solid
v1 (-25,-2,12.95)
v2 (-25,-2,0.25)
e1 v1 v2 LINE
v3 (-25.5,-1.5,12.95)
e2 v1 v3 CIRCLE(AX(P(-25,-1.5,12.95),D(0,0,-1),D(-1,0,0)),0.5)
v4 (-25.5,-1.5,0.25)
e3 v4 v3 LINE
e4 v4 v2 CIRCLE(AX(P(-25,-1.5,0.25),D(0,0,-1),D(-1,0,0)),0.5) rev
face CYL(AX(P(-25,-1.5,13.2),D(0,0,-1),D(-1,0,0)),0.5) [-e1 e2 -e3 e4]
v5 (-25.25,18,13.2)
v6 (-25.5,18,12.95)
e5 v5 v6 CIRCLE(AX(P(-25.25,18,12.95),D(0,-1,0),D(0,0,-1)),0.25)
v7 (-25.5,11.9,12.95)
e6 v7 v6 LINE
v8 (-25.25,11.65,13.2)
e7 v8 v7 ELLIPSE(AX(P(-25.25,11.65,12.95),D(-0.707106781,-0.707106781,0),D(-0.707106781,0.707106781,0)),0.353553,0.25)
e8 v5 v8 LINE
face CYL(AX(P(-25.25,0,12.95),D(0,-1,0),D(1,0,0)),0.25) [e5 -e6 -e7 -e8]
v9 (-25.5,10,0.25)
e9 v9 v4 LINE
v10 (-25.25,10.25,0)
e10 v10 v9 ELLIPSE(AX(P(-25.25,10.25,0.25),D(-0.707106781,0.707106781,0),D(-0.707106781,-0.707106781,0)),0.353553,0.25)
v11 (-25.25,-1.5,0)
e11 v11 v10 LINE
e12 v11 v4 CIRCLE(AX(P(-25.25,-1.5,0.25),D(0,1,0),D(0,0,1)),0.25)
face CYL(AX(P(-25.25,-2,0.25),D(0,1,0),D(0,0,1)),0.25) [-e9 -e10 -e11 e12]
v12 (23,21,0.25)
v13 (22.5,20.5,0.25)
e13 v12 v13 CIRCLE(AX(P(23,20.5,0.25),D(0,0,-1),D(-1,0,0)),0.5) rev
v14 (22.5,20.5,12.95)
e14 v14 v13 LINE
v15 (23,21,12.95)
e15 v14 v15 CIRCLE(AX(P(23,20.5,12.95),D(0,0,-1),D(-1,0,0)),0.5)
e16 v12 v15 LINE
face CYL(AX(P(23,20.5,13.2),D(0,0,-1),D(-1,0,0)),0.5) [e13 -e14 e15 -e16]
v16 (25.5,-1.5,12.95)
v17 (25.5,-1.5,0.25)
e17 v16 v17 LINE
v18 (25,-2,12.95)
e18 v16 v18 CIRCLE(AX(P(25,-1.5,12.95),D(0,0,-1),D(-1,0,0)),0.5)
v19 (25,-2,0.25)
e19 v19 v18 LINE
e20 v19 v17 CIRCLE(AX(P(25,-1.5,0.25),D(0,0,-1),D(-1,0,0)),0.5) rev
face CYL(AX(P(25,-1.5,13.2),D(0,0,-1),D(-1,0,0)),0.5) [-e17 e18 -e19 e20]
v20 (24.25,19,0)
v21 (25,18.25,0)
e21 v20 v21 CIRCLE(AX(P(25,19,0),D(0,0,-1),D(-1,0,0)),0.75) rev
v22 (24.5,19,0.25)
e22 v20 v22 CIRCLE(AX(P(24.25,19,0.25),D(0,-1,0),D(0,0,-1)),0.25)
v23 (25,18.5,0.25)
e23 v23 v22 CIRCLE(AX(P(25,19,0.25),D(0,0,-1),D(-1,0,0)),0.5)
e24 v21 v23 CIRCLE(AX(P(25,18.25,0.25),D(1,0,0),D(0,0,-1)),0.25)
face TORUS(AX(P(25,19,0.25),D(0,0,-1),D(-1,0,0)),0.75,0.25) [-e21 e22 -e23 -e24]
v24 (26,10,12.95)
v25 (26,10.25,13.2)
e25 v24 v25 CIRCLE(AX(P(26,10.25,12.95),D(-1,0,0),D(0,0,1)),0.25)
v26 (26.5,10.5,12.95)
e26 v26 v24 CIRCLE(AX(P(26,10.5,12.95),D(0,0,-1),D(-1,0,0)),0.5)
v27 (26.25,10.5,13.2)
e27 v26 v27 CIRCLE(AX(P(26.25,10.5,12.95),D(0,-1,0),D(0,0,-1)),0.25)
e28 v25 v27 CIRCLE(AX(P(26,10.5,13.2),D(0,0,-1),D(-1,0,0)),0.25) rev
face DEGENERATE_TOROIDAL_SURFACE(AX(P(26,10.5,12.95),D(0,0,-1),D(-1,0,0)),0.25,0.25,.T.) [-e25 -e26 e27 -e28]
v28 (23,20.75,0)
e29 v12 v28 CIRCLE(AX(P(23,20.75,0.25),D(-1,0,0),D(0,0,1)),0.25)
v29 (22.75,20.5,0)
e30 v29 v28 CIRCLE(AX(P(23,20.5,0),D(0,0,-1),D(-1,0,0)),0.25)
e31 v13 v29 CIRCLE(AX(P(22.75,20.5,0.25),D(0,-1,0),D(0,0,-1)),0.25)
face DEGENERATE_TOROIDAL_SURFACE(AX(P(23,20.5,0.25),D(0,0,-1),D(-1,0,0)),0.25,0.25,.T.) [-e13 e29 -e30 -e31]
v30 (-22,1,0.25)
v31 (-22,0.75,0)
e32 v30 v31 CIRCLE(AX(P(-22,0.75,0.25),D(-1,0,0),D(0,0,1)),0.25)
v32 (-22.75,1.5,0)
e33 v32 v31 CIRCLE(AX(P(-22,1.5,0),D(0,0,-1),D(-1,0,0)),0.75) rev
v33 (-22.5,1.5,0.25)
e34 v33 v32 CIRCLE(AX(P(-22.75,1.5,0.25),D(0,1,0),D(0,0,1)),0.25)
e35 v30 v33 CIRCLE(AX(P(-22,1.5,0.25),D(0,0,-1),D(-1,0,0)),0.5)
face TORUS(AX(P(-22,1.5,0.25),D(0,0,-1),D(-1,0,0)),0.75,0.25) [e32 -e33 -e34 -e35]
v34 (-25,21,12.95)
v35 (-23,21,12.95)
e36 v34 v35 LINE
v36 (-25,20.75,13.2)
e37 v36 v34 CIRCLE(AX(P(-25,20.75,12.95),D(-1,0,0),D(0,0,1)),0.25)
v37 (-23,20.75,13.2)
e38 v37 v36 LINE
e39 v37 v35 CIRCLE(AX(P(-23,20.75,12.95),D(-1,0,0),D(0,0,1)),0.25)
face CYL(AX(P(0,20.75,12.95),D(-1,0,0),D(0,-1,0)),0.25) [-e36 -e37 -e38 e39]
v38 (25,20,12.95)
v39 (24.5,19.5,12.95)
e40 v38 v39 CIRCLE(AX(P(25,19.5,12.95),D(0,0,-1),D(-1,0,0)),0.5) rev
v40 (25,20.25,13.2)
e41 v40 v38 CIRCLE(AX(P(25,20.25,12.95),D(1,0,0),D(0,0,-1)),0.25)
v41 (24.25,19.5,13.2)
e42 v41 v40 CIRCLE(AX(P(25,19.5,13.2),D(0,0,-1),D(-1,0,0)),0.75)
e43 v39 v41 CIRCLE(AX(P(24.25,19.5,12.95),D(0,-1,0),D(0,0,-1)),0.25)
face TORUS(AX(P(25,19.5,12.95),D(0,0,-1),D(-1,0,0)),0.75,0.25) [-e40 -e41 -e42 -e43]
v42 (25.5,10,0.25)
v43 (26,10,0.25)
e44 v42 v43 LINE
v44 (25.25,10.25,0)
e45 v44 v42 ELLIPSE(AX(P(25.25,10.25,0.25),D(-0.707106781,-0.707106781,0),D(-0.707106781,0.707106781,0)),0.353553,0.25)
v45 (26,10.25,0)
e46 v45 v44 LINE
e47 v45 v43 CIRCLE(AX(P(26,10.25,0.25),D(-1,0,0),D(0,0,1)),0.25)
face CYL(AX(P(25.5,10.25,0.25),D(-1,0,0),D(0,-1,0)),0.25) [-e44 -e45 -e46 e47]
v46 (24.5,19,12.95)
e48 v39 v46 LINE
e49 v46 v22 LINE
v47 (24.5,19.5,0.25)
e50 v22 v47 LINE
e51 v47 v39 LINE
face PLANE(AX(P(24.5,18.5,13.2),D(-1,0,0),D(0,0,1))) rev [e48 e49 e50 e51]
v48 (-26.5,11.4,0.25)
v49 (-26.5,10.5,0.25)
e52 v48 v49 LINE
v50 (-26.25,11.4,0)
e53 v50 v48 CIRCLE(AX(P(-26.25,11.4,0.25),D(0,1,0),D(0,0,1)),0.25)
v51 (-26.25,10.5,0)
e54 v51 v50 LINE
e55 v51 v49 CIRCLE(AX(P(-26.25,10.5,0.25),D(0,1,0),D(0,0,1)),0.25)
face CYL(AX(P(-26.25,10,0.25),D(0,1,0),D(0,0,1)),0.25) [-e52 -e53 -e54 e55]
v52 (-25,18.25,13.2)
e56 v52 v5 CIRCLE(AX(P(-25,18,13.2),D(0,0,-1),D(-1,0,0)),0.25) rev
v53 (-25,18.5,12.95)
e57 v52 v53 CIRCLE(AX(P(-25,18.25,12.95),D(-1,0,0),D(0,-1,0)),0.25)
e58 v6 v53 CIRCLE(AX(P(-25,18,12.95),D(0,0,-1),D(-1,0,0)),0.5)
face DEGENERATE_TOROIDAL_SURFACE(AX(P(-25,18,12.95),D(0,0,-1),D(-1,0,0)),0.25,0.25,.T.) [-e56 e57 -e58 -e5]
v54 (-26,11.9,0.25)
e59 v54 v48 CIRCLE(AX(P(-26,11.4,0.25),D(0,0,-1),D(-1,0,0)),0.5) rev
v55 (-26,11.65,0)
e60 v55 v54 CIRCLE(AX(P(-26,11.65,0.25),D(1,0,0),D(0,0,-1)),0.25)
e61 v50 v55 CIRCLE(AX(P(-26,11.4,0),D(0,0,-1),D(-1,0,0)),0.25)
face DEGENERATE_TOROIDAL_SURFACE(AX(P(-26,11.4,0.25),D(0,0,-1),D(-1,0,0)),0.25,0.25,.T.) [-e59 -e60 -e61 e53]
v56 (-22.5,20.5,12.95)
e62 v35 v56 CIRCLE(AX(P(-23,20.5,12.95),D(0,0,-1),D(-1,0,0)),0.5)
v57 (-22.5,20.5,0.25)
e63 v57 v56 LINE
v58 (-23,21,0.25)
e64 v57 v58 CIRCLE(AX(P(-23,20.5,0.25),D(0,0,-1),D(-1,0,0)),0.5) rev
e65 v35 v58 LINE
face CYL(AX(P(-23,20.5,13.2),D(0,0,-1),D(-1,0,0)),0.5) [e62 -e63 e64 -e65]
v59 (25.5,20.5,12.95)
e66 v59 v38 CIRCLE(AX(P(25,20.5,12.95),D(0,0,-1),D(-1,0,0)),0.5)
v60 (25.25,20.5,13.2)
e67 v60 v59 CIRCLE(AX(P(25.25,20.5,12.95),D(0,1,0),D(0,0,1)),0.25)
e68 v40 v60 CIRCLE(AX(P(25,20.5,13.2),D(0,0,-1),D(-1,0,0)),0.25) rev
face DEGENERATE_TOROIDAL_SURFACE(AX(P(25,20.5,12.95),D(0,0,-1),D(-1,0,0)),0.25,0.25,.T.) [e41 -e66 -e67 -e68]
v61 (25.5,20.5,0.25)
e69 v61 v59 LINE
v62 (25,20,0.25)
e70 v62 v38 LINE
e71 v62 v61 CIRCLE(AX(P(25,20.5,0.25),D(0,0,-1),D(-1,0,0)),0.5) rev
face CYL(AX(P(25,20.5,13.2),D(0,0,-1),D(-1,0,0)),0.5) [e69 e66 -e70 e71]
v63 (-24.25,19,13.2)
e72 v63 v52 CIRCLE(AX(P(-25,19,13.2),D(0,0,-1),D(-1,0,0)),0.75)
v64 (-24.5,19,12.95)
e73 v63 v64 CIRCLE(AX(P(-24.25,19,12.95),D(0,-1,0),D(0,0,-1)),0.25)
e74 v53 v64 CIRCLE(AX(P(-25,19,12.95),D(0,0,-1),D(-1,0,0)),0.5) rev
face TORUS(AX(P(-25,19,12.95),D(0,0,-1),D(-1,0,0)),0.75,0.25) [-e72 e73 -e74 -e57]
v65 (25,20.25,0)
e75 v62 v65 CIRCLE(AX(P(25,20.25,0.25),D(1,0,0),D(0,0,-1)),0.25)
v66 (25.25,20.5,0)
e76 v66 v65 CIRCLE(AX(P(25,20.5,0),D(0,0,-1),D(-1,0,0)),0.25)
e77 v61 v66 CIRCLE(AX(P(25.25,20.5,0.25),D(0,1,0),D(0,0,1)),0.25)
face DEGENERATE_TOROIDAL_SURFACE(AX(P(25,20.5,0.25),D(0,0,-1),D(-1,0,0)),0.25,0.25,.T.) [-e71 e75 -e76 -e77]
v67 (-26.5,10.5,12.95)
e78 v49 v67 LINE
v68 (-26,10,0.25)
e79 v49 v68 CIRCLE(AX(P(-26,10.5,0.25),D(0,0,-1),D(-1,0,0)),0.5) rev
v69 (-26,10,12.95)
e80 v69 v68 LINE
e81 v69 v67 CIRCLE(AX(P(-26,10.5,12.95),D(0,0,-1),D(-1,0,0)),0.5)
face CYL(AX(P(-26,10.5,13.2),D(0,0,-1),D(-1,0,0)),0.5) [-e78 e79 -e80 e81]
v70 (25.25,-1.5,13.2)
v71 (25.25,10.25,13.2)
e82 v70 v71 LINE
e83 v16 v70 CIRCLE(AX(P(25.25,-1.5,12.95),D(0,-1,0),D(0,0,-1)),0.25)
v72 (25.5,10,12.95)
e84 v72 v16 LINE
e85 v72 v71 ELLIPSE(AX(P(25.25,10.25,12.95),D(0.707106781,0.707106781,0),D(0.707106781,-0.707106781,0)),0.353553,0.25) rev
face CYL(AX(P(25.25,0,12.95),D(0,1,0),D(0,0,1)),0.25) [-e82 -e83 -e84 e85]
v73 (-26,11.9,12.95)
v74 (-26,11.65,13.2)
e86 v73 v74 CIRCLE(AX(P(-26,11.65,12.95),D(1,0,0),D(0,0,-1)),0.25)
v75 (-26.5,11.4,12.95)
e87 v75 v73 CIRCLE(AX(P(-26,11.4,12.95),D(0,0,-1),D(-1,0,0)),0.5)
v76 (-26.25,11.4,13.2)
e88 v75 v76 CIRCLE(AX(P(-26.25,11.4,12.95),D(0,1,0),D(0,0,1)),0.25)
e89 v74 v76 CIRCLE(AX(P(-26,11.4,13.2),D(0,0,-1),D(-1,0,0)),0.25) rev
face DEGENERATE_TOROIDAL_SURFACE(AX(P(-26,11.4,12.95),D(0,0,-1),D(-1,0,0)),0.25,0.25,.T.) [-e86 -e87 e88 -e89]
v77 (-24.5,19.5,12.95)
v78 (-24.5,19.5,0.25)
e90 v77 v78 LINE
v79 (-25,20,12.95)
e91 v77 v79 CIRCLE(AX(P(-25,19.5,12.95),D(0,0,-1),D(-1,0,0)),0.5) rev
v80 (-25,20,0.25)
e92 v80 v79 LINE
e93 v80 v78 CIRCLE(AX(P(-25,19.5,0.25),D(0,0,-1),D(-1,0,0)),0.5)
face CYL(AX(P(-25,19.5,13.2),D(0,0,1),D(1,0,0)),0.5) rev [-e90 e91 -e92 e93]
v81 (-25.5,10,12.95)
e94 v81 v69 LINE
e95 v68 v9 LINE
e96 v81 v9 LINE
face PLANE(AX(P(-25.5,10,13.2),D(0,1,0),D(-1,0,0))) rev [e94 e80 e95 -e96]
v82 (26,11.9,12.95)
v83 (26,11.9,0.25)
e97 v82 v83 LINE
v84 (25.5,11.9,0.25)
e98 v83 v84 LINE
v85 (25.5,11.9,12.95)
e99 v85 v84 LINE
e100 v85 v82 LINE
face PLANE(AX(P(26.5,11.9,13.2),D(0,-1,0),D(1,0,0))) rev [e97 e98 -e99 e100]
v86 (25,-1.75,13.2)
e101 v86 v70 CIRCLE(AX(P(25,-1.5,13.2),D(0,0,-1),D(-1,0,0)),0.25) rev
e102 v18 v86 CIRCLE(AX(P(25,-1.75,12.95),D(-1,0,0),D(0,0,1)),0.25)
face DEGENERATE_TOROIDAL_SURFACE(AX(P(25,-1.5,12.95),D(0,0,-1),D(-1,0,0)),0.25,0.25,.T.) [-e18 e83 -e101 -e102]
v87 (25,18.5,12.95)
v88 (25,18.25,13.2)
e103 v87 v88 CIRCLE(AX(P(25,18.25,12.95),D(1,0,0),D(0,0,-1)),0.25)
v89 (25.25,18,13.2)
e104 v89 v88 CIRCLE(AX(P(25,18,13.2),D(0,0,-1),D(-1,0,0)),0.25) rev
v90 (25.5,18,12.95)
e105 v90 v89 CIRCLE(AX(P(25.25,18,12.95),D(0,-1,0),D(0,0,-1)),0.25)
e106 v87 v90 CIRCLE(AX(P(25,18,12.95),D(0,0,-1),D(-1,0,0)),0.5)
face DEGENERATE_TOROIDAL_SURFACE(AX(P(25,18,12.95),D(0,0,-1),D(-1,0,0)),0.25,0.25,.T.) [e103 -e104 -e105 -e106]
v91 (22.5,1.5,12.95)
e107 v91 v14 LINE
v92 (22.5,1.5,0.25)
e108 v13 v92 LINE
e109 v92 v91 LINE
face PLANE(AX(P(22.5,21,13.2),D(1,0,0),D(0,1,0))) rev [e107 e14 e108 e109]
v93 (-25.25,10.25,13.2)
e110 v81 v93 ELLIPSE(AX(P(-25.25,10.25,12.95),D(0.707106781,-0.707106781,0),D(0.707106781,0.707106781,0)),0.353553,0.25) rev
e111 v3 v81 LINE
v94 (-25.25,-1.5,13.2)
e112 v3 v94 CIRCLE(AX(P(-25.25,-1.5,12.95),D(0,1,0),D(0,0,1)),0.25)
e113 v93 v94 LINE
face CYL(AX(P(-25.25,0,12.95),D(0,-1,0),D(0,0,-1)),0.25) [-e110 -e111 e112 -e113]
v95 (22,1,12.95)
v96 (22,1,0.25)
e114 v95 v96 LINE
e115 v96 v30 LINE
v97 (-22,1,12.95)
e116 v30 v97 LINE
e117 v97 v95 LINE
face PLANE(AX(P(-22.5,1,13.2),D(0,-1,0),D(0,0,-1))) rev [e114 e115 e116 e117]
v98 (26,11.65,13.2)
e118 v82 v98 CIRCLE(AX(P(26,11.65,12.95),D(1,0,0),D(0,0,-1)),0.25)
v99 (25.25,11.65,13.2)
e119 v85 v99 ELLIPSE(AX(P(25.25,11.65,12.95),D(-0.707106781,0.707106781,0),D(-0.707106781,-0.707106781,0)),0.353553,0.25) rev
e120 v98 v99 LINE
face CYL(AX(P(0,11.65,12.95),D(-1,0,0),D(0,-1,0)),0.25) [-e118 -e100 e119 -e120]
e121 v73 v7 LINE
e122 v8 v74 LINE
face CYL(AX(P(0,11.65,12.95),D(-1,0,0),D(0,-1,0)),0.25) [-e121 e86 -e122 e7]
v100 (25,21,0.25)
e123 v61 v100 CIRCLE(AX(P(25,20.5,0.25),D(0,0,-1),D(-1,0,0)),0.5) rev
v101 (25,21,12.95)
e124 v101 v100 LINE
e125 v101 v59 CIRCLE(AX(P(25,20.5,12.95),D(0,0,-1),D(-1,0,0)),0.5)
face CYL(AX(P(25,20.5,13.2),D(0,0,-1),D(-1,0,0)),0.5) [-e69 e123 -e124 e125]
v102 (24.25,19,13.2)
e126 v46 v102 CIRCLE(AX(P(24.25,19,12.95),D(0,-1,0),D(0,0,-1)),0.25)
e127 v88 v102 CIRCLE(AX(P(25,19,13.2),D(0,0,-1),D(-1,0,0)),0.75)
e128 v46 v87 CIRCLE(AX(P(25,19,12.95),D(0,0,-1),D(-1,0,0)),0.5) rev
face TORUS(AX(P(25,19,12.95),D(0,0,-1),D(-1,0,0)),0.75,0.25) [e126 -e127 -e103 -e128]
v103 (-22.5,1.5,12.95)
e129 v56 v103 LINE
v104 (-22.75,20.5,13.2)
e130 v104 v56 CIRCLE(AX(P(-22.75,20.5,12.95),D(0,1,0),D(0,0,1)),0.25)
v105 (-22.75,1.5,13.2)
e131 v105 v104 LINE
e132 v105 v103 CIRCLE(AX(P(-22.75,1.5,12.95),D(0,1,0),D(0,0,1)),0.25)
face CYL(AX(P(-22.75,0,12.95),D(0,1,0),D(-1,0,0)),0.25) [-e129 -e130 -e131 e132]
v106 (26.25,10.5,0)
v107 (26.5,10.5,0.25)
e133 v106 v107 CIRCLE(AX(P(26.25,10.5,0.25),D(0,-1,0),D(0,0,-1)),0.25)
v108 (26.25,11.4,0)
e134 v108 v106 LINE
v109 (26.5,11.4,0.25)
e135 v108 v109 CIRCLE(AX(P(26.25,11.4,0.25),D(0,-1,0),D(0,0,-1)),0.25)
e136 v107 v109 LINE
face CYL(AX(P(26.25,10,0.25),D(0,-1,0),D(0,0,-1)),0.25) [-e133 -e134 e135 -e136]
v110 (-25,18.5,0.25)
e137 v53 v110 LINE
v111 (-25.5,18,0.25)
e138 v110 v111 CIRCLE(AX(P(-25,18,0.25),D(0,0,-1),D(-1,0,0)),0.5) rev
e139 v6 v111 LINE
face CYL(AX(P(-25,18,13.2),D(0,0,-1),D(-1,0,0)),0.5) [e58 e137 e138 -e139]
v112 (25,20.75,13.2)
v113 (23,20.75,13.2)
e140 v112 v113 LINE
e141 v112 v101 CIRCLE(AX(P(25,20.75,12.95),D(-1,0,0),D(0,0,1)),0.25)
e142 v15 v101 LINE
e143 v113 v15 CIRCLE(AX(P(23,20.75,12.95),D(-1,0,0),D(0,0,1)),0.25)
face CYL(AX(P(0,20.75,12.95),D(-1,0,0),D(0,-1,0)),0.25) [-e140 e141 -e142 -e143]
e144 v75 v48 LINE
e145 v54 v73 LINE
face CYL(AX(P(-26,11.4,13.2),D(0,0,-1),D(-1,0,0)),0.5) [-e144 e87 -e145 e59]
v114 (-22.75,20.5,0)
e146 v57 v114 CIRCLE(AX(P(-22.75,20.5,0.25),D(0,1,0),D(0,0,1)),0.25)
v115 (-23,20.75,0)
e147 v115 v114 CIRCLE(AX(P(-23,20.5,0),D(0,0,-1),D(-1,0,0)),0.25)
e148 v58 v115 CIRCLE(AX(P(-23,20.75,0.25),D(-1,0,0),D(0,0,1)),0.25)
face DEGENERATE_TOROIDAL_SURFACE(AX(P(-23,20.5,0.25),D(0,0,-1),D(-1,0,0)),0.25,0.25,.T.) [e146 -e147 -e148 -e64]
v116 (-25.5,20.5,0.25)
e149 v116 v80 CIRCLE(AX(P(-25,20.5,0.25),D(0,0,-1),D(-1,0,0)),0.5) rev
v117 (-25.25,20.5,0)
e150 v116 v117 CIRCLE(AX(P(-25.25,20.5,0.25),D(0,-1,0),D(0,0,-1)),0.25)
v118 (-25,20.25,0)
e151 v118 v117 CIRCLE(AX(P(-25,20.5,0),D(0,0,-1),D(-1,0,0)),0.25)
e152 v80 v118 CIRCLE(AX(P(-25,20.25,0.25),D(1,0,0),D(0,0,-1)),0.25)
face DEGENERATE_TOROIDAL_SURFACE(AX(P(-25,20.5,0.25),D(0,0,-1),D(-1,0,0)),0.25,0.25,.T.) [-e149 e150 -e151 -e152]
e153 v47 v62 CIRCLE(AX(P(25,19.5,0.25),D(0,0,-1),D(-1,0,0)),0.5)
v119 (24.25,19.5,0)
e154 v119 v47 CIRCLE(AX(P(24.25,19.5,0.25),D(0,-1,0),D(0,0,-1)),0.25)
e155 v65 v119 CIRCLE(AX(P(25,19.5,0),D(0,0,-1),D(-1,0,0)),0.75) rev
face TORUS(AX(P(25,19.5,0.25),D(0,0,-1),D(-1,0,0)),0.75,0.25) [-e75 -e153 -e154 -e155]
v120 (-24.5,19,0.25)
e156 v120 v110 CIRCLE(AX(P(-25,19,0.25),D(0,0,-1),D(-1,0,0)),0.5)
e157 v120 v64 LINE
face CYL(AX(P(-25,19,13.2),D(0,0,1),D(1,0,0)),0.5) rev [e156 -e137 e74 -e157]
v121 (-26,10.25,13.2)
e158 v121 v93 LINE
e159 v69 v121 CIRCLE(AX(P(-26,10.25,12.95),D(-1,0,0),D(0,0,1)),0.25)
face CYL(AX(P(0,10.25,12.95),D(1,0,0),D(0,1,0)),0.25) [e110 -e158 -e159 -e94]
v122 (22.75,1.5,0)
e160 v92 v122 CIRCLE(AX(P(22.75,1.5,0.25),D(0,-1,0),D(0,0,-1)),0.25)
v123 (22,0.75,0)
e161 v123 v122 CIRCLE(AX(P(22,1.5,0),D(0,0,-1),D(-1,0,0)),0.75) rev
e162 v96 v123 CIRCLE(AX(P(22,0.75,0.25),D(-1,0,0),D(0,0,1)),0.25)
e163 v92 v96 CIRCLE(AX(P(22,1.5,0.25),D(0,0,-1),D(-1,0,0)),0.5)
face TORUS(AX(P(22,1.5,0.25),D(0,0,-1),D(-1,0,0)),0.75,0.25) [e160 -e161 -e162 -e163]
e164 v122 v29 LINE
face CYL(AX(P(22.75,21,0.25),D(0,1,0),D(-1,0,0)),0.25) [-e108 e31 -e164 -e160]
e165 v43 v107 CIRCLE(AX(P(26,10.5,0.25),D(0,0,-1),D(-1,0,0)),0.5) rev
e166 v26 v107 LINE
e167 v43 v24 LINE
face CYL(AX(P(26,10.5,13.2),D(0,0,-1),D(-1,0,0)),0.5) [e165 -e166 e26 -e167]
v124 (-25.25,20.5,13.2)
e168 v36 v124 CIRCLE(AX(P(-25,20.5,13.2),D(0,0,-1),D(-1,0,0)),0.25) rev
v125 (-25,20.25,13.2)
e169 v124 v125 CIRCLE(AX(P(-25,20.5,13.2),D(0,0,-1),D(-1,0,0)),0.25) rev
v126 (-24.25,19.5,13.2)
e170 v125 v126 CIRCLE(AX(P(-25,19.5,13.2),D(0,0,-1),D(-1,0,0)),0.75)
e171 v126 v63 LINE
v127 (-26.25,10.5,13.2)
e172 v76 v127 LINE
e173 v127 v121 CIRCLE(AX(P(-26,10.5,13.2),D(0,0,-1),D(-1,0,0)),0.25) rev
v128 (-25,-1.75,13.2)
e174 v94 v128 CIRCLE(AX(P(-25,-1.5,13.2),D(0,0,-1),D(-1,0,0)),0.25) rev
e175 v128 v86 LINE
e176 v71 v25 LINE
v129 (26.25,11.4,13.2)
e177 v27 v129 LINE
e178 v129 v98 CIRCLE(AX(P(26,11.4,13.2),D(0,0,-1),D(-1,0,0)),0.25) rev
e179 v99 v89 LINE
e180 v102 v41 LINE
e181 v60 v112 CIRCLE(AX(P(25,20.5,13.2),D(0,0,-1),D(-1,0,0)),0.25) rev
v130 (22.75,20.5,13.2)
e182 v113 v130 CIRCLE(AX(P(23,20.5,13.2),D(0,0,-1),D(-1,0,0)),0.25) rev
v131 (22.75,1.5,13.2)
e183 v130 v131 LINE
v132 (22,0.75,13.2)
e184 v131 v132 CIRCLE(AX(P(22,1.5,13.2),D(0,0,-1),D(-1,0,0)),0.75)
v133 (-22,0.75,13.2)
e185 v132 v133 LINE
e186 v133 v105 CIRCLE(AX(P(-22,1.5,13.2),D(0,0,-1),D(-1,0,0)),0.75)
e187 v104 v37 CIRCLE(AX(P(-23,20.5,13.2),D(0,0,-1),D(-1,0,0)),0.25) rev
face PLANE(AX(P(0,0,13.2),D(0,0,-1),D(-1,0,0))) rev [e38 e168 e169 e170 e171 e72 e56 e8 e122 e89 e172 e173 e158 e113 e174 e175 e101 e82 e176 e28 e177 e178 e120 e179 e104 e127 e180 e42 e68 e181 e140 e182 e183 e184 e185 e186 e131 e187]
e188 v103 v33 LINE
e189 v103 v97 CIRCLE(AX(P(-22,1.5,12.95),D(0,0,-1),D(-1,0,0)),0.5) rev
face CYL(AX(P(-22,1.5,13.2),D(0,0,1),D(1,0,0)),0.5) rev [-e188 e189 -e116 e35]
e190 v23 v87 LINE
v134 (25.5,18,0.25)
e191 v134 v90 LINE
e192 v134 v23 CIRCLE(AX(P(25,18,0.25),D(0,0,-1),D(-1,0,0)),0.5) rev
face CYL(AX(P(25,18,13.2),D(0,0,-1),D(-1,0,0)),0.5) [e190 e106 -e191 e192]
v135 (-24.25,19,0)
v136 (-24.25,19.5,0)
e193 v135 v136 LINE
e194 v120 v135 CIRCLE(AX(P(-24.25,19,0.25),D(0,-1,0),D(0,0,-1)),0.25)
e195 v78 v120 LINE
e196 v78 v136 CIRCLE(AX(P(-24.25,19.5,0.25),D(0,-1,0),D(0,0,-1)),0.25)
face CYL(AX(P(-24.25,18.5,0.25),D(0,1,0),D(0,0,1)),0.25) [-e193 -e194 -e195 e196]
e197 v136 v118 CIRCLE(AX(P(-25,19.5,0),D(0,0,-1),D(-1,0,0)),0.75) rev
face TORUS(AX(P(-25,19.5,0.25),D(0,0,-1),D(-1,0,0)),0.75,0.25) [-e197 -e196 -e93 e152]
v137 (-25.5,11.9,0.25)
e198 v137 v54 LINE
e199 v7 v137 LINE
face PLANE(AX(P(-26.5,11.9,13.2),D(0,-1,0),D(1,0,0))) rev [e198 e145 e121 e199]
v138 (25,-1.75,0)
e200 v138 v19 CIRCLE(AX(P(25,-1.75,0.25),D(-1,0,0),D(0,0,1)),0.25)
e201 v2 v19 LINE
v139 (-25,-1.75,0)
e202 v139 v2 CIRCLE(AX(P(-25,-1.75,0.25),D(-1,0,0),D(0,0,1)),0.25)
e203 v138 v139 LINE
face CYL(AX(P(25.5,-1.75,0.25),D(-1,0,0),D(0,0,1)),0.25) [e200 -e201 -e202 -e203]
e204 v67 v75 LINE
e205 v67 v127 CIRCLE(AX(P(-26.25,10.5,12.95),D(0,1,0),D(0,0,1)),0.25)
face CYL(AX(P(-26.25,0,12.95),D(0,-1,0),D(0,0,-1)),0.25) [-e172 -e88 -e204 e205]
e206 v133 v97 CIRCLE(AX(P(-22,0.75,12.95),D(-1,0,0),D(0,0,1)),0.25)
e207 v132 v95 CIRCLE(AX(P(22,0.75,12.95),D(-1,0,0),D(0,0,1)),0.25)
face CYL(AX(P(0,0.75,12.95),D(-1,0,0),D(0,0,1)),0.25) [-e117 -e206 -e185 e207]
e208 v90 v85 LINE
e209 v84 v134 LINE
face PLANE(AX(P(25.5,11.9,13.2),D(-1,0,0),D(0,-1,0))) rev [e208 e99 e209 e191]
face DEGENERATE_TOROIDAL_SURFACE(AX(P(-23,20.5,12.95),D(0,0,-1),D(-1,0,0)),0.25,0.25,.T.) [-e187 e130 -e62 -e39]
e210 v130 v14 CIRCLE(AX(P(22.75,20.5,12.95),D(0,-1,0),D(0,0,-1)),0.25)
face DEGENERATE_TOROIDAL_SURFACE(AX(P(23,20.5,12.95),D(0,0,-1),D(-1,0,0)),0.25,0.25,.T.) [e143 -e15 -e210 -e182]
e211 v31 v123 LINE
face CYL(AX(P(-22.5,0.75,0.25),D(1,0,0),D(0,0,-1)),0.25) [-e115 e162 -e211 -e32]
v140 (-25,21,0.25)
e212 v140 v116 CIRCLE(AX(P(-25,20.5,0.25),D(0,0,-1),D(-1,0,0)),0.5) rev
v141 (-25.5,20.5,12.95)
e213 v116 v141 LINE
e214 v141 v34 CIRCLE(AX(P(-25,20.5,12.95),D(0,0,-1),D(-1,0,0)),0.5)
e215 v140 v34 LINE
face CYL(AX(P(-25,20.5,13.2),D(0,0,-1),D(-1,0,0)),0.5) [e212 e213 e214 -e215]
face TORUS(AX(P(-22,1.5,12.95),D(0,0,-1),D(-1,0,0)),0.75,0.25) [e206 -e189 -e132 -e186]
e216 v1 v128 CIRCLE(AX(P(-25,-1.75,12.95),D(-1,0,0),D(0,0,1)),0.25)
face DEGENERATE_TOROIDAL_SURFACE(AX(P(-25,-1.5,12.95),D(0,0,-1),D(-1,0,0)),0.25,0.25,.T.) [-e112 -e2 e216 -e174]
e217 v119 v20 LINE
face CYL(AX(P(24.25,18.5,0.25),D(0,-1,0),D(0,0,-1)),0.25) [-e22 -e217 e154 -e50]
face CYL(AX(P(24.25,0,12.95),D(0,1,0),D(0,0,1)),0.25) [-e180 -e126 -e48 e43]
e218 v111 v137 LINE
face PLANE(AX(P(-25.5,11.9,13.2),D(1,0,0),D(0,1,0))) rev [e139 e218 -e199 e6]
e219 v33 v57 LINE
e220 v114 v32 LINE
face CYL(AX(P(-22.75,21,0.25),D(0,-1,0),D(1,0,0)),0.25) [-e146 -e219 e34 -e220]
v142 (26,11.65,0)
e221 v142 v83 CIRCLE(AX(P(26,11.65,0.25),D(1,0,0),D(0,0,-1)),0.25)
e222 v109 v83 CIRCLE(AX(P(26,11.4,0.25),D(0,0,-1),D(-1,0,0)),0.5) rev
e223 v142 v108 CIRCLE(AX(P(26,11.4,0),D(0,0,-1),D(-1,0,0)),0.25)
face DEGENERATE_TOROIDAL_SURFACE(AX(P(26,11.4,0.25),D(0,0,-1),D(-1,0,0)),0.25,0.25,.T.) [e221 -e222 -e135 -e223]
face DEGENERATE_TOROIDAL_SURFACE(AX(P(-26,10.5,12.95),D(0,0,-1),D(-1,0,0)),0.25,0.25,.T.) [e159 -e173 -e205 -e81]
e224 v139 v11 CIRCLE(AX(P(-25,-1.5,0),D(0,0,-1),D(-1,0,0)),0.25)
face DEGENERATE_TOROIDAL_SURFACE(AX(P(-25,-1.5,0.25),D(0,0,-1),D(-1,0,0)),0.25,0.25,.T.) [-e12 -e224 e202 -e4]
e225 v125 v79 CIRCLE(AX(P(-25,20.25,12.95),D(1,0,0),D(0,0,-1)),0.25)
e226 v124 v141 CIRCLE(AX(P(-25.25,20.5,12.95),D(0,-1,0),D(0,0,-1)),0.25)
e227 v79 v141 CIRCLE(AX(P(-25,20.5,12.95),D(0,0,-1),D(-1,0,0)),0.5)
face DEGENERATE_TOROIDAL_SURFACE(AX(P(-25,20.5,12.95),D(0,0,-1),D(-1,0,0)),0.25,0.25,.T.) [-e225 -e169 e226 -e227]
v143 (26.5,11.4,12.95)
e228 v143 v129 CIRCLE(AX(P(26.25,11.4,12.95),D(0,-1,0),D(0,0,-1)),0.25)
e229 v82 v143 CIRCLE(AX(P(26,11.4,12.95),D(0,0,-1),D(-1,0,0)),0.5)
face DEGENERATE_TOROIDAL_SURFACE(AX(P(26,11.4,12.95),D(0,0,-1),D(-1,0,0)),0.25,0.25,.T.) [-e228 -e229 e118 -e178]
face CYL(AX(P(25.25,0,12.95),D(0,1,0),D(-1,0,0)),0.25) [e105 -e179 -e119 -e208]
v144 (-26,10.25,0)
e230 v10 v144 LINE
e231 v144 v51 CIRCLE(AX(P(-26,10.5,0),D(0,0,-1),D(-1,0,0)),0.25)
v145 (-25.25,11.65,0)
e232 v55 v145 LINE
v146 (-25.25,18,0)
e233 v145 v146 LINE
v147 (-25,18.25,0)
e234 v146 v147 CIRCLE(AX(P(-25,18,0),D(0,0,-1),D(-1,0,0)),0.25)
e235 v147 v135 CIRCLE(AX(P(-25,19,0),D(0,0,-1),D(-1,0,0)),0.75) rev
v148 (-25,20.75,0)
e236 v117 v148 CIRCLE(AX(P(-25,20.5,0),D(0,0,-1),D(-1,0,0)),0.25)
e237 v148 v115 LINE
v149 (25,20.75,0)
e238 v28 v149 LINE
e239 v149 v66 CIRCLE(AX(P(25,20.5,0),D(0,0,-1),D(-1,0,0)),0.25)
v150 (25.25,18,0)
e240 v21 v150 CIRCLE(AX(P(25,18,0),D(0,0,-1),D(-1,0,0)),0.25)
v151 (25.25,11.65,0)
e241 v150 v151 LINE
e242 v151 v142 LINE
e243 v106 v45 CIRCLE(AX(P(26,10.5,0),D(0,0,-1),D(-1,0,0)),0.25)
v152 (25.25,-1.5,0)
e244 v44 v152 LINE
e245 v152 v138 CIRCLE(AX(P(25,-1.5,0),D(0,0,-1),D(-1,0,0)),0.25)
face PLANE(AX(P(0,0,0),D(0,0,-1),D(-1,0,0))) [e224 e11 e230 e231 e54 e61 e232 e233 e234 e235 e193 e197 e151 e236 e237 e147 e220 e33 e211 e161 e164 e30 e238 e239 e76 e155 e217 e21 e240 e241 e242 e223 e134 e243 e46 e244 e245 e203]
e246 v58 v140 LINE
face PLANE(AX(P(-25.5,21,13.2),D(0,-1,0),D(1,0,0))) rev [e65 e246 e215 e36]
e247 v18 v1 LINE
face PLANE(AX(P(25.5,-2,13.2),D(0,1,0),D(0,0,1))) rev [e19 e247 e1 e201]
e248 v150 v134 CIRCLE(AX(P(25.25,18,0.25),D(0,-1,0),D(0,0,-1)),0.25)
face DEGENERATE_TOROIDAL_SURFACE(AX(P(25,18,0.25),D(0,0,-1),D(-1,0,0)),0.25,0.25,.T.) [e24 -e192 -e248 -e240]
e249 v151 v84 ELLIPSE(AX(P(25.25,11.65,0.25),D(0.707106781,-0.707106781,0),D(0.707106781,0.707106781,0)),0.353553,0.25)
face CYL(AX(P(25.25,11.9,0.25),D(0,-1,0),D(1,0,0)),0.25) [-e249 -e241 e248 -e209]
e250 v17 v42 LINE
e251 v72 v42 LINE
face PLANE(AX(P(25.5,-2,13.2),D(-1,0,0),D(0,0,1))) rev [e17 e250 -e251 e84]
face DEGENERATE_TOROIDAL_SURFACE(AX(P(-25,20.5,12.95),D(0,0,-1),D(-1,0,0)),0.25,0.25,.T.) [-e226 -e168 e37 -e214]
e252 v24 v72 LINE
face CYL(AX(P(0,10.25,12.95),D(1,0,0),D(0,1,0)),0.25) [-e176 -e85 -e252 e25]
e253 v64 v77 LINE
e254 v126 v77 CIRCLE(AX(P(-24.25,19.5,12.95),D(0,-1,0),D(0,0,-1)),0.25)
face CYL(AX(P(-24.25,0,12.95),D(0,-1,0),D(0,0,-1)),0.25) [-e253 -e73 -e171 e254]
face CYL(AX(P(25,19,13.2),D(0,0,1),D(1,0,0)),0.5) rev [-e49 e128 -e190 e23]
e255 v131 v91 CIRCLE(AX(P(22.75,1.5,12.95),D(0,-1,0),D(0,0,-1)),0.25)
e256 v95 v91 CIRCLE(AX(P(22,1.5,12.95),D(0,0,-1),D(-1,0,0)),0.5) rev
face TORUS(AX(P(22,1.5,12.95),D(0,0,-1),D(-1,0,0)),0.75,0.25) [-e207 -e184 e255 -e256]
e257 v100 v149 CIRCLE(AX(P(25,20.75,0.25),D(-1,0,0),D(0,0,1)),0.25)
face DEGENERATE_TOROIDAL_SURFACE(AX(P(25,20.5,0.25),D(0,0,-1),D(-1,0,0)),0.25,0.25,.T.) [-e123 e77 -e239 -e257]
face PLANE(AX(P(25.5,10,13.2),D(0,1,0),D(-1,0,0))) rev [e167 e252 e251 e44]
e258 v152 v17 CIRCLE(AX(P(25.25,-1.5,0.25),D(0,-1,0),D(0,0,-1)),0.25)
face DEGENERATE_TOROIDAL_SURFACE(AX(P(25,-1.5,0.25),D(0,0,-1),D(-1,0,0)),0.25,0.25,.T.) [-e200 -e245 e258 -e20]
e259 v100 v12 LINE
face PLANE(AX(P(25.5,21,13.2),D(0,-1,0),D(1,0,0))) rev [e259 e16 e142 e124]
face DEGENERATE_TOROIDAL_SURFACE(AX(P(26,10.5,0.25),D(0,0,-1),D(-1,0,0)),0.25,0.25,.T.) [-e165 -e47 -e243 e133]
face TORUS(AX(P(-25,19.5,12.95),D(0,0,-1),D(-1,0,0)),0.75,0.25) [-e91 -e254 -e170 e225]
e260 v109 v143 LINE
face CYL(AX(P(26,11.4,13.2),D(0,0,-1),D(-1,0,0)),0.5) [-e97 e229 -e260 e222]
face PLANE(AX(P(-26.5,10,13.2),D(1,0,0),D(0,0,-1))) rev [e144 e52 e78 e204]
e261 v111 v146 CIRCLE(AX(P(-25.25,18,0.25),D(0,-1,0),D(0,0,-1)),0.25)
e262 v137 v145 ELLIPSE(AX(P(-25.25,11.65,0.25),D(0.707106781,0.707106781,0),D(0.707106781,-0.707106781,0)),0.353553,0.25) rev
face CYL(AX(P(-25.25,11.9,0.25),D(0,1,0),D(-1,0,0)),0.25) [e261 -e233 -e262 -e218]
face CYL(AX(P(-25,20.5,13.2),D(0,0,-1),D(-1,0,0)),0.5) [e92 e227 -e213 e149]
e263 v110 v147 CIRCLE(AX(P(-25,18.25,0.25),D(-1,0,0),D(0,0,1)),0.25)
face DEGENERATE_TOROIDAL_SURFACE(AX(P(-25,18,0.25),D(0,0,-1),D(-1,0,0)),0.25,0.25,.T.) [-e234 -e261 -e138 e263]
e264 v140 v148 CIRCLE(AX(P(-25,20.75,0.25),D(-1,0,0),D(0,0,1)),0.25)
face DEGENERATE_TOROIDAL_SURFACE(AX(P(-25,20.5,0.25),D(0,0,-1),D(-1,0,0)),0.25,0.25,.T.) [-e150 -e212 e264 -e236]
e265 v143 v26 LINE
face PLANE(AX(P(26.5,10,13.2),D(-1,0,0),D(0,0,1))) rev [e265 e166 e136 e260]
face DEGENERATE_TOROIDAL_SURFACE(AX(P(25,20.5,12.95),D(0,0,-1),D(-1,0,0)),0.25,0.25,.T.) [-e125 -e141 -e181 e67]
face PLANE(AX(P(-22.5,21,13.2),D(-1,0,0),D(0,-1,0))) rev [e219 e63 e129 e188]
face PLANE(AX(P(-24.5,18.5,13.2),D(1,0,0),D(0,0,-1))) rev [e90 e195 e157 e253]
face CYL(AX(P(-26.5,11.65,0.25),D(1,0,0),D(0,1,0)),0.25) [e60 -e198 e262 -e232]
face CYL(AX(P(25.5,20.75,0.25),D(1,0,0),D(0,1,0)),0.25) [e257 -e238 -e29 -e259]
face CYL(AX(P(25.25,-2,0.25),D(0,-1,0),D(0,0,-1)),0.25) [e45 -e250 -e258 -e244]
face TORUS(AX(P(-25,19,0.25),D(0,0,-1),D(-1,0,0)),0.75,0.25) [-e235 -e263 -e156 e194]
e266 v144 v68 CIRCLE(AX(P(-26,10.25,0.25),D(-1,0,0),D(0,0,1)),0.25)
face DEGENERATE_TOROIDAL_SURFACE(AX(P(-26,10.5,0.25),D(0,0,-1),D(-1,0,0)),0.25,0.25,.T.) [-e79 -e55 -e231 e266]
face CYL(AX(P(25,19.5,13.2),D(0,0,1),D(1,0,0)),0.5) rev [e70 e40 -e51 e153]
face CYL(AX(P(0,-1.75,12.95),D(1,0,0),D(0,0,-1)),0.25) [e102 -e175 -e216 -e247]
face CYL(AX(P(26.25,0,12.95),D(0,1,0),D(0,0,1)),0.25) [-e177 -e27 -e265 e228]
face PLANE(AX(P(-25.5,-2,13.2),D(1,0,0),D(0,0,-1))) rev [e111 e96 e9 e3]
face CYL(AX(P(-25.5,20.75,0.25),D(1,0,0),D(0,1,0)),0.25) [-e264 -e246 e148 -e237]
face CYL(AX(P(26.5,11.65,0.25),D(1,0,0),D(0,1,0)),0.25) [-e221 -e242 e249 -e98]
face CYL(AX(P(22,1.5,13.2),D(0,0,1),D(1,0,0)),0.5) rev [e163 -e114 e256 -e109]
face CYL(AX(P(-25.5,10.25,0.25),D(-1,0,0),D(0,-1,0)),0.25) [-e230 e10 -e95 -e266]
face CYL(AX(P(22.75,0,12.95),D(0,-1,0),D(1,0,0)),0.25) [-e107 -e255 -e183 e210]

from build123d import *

# Parameters (mm, degrees)
BOSS_EXTRUDE1_DEPTH = 13.2
FILLET1_R           = 0.5
FILLET2_R           = 0.25


with BuildPart() as part:
    # Sketch1 → Boss-Extrude1 (new body)
    with BuildSketch(Plane.XY):
        Polygon((25.5, -2), (-25.5, -2), (-25.5, 10), (-26.5, 10), (-26.5, 11.9), (-25.5, 11.9), (-25.5, 18.5), (-24.5, 18.5), (-24.5, 20), (-25.5, 20), (-25.5, 21), (-22.5, 21), (-22.5, 1), (22.5, 1), (22.5, 21), (25.5, 21), (25.5, 20), (24.5, 20), (24.5, 18.5), (25.5, 18.5), (25.5, 11.9), (26.5, 11.9), (26.5, 10), (25.5, 10), align=None)
    extrude(amount=BOSS_EXTRUDE1_DEPTH)

    # Fillet1
    fillet1_edges = [part.edges().sort_by_distance(p)[0] for p in [
        (-25.5, 21, 6.6),
        (-25.5, 20, 6.6),
        (-24.5, 20, 6.6),
        (-25.5, 18.5, 6.6),
        (-24.5, 18.5, 6.6),
        (25.5, 18.5, 6.6),
        (24.5, 18.5, 6.6),
        (24.5, 20, 6.6),
        (25.5, 20, 6.6),
        (25.5, 21, 6.6),
        (-22.5, 21, 6.6),
        (22.5, 21, 6.6),
        (22.5, 1, 6.6),
        (-22.5, 1, 6.6),
        (25.5, -2, 6.6),
        (-25.5, -2, 6.6),
        (-26.5, 10, 6.6),
        (-26.5, 11.9, 6.6),
        (26.5, 10, 6.6),
        (26.5, 11.9, 6.6),
    ]]
    fillet(fillet1_edges, radius=FILLET1_R - 0.0001)  # a hair under: the kernel refuses the full size

    # Fillet2
    fillet2_edges = [part.edges().sort_by_distance(p)[0] for p in [
        (-25.35358268, 20.85358268, 13.2),
        (-24.64641732, 19.85358268, 0),
        (-24.64641732, 19.85358268, 13.2),
        (-24.64641732, 18.64641732, 0),
        (-24.64641732, 18.64641732, 13.2),
        (24.64641732, 18.64641732, 0),
        (24.64641732, 18.64641732, 13.2),
        (24.64641732, 19.85358268, 0),
        (24.64641732, 19.85358268, 13.2),
        (22.35358268, 1.14641732, 0),
        (22.35358268, 1.14641732, 13.2),
        (-22.35358268, 1.14641732, 0),
        (-22.35358268, 1.14641732, 13.2),
        (25.75005, 10, 13.2),
        (-25.75005, 11.9, 0),
        (25.5, 14.95005, 13.2),
        (25.5, 14.95005, 0),
        (25.75005, 10, 0),
        (-25.5, 4.24995, 0),
        (-25.75005, 10, 0),
        (-26.5, 10.95, 0),
        (-25.5, 14.95005, 0),
        (-24.5, 19.25, 0),
        (-24, 21, 0),
        (-22.5, 11, 0),
        (0, 1, 0),
        (-25.5, 4.24995, 13.2),
        (-25.75005, 11.9, 13.2),
        (22.5, 11, 0),
        (24, 21, 0),
        (24.5, 19.25, 0),
        (25.75005, 11.9, 0),
        (26.5, 10.95, 0),
        (25.5, 4.24995, 0),
        (0, -2, 0),
        (26.35358268, 11.75358268, 0),
        (26.35358268, 10.14641732, 0),
        (-26.35358268, 11.75358268, 0),
        (-26.35358268, 10.14641732, 0),
        (-25.35358268, -1.85358268, 0),
        (25.35358268, -1.85358268, 0),
        (22.64641732, 20.85358268, 0),
        (-22.64641732, 20.85358268, 0),
        (25.35358268, 20.85358268, 0),
        (25.35358268, 20.14641732, 0),
        (25.35358268, 18.35358268, 0),
        (-25.35358268, 18.35358268, 0),
        (-25.35358268, 20.14641732, 0),
        (-25.35358268, 20.85358268, 0),
        (-24, 21, 13.2),
        (-25.75005, 10, 13.2),
        (0, -2, 13.2),
        (25.5, 4.24995, 13.2),
        (26.5, 10.95, 13.2),
        (25.75005, 11.9, 13.2),
        (24.5, 19.25, 13.2),
        (24, 21, 13.2),
        (22.5, 11, 13.2),
        (0, 1, 13.2),
        (-22.5, 11, 13.2),
        (-24.5, 19.25, 13.2),
        (-25.5, 14.95005, 13.2),
        (-26.5, 10.95, 13.2),
        (26.35358268, 11.75358268, 13.2),
        (26.35358268, 10.14641732, 13.2),
        (-26.35358268, 11.75358268, 13.2),
        (-26.35358268, 10.14641732, 13.2),
        (-25.35358268, -1.85358268, 13.2),
        (25.35358268, -1.85358268, 13.2),
        (22.64641732, 20.85358268, 13.2),
        (-22.64641732, 20.85358268, 13.2),
        (25.35358268, 20.85358268, 13.2),
        (25.35358268, 20.14641732, 13.2),
        (25.35358268, 18.35358268, 13.2),
        (-25.35358268, 18.35358268, 13.2),
        (-25.35358268, 20.14641732, 13.2),
    ]]
    fillet(fillet2_edges, radius=FILLET2_R)


solid = part.part
